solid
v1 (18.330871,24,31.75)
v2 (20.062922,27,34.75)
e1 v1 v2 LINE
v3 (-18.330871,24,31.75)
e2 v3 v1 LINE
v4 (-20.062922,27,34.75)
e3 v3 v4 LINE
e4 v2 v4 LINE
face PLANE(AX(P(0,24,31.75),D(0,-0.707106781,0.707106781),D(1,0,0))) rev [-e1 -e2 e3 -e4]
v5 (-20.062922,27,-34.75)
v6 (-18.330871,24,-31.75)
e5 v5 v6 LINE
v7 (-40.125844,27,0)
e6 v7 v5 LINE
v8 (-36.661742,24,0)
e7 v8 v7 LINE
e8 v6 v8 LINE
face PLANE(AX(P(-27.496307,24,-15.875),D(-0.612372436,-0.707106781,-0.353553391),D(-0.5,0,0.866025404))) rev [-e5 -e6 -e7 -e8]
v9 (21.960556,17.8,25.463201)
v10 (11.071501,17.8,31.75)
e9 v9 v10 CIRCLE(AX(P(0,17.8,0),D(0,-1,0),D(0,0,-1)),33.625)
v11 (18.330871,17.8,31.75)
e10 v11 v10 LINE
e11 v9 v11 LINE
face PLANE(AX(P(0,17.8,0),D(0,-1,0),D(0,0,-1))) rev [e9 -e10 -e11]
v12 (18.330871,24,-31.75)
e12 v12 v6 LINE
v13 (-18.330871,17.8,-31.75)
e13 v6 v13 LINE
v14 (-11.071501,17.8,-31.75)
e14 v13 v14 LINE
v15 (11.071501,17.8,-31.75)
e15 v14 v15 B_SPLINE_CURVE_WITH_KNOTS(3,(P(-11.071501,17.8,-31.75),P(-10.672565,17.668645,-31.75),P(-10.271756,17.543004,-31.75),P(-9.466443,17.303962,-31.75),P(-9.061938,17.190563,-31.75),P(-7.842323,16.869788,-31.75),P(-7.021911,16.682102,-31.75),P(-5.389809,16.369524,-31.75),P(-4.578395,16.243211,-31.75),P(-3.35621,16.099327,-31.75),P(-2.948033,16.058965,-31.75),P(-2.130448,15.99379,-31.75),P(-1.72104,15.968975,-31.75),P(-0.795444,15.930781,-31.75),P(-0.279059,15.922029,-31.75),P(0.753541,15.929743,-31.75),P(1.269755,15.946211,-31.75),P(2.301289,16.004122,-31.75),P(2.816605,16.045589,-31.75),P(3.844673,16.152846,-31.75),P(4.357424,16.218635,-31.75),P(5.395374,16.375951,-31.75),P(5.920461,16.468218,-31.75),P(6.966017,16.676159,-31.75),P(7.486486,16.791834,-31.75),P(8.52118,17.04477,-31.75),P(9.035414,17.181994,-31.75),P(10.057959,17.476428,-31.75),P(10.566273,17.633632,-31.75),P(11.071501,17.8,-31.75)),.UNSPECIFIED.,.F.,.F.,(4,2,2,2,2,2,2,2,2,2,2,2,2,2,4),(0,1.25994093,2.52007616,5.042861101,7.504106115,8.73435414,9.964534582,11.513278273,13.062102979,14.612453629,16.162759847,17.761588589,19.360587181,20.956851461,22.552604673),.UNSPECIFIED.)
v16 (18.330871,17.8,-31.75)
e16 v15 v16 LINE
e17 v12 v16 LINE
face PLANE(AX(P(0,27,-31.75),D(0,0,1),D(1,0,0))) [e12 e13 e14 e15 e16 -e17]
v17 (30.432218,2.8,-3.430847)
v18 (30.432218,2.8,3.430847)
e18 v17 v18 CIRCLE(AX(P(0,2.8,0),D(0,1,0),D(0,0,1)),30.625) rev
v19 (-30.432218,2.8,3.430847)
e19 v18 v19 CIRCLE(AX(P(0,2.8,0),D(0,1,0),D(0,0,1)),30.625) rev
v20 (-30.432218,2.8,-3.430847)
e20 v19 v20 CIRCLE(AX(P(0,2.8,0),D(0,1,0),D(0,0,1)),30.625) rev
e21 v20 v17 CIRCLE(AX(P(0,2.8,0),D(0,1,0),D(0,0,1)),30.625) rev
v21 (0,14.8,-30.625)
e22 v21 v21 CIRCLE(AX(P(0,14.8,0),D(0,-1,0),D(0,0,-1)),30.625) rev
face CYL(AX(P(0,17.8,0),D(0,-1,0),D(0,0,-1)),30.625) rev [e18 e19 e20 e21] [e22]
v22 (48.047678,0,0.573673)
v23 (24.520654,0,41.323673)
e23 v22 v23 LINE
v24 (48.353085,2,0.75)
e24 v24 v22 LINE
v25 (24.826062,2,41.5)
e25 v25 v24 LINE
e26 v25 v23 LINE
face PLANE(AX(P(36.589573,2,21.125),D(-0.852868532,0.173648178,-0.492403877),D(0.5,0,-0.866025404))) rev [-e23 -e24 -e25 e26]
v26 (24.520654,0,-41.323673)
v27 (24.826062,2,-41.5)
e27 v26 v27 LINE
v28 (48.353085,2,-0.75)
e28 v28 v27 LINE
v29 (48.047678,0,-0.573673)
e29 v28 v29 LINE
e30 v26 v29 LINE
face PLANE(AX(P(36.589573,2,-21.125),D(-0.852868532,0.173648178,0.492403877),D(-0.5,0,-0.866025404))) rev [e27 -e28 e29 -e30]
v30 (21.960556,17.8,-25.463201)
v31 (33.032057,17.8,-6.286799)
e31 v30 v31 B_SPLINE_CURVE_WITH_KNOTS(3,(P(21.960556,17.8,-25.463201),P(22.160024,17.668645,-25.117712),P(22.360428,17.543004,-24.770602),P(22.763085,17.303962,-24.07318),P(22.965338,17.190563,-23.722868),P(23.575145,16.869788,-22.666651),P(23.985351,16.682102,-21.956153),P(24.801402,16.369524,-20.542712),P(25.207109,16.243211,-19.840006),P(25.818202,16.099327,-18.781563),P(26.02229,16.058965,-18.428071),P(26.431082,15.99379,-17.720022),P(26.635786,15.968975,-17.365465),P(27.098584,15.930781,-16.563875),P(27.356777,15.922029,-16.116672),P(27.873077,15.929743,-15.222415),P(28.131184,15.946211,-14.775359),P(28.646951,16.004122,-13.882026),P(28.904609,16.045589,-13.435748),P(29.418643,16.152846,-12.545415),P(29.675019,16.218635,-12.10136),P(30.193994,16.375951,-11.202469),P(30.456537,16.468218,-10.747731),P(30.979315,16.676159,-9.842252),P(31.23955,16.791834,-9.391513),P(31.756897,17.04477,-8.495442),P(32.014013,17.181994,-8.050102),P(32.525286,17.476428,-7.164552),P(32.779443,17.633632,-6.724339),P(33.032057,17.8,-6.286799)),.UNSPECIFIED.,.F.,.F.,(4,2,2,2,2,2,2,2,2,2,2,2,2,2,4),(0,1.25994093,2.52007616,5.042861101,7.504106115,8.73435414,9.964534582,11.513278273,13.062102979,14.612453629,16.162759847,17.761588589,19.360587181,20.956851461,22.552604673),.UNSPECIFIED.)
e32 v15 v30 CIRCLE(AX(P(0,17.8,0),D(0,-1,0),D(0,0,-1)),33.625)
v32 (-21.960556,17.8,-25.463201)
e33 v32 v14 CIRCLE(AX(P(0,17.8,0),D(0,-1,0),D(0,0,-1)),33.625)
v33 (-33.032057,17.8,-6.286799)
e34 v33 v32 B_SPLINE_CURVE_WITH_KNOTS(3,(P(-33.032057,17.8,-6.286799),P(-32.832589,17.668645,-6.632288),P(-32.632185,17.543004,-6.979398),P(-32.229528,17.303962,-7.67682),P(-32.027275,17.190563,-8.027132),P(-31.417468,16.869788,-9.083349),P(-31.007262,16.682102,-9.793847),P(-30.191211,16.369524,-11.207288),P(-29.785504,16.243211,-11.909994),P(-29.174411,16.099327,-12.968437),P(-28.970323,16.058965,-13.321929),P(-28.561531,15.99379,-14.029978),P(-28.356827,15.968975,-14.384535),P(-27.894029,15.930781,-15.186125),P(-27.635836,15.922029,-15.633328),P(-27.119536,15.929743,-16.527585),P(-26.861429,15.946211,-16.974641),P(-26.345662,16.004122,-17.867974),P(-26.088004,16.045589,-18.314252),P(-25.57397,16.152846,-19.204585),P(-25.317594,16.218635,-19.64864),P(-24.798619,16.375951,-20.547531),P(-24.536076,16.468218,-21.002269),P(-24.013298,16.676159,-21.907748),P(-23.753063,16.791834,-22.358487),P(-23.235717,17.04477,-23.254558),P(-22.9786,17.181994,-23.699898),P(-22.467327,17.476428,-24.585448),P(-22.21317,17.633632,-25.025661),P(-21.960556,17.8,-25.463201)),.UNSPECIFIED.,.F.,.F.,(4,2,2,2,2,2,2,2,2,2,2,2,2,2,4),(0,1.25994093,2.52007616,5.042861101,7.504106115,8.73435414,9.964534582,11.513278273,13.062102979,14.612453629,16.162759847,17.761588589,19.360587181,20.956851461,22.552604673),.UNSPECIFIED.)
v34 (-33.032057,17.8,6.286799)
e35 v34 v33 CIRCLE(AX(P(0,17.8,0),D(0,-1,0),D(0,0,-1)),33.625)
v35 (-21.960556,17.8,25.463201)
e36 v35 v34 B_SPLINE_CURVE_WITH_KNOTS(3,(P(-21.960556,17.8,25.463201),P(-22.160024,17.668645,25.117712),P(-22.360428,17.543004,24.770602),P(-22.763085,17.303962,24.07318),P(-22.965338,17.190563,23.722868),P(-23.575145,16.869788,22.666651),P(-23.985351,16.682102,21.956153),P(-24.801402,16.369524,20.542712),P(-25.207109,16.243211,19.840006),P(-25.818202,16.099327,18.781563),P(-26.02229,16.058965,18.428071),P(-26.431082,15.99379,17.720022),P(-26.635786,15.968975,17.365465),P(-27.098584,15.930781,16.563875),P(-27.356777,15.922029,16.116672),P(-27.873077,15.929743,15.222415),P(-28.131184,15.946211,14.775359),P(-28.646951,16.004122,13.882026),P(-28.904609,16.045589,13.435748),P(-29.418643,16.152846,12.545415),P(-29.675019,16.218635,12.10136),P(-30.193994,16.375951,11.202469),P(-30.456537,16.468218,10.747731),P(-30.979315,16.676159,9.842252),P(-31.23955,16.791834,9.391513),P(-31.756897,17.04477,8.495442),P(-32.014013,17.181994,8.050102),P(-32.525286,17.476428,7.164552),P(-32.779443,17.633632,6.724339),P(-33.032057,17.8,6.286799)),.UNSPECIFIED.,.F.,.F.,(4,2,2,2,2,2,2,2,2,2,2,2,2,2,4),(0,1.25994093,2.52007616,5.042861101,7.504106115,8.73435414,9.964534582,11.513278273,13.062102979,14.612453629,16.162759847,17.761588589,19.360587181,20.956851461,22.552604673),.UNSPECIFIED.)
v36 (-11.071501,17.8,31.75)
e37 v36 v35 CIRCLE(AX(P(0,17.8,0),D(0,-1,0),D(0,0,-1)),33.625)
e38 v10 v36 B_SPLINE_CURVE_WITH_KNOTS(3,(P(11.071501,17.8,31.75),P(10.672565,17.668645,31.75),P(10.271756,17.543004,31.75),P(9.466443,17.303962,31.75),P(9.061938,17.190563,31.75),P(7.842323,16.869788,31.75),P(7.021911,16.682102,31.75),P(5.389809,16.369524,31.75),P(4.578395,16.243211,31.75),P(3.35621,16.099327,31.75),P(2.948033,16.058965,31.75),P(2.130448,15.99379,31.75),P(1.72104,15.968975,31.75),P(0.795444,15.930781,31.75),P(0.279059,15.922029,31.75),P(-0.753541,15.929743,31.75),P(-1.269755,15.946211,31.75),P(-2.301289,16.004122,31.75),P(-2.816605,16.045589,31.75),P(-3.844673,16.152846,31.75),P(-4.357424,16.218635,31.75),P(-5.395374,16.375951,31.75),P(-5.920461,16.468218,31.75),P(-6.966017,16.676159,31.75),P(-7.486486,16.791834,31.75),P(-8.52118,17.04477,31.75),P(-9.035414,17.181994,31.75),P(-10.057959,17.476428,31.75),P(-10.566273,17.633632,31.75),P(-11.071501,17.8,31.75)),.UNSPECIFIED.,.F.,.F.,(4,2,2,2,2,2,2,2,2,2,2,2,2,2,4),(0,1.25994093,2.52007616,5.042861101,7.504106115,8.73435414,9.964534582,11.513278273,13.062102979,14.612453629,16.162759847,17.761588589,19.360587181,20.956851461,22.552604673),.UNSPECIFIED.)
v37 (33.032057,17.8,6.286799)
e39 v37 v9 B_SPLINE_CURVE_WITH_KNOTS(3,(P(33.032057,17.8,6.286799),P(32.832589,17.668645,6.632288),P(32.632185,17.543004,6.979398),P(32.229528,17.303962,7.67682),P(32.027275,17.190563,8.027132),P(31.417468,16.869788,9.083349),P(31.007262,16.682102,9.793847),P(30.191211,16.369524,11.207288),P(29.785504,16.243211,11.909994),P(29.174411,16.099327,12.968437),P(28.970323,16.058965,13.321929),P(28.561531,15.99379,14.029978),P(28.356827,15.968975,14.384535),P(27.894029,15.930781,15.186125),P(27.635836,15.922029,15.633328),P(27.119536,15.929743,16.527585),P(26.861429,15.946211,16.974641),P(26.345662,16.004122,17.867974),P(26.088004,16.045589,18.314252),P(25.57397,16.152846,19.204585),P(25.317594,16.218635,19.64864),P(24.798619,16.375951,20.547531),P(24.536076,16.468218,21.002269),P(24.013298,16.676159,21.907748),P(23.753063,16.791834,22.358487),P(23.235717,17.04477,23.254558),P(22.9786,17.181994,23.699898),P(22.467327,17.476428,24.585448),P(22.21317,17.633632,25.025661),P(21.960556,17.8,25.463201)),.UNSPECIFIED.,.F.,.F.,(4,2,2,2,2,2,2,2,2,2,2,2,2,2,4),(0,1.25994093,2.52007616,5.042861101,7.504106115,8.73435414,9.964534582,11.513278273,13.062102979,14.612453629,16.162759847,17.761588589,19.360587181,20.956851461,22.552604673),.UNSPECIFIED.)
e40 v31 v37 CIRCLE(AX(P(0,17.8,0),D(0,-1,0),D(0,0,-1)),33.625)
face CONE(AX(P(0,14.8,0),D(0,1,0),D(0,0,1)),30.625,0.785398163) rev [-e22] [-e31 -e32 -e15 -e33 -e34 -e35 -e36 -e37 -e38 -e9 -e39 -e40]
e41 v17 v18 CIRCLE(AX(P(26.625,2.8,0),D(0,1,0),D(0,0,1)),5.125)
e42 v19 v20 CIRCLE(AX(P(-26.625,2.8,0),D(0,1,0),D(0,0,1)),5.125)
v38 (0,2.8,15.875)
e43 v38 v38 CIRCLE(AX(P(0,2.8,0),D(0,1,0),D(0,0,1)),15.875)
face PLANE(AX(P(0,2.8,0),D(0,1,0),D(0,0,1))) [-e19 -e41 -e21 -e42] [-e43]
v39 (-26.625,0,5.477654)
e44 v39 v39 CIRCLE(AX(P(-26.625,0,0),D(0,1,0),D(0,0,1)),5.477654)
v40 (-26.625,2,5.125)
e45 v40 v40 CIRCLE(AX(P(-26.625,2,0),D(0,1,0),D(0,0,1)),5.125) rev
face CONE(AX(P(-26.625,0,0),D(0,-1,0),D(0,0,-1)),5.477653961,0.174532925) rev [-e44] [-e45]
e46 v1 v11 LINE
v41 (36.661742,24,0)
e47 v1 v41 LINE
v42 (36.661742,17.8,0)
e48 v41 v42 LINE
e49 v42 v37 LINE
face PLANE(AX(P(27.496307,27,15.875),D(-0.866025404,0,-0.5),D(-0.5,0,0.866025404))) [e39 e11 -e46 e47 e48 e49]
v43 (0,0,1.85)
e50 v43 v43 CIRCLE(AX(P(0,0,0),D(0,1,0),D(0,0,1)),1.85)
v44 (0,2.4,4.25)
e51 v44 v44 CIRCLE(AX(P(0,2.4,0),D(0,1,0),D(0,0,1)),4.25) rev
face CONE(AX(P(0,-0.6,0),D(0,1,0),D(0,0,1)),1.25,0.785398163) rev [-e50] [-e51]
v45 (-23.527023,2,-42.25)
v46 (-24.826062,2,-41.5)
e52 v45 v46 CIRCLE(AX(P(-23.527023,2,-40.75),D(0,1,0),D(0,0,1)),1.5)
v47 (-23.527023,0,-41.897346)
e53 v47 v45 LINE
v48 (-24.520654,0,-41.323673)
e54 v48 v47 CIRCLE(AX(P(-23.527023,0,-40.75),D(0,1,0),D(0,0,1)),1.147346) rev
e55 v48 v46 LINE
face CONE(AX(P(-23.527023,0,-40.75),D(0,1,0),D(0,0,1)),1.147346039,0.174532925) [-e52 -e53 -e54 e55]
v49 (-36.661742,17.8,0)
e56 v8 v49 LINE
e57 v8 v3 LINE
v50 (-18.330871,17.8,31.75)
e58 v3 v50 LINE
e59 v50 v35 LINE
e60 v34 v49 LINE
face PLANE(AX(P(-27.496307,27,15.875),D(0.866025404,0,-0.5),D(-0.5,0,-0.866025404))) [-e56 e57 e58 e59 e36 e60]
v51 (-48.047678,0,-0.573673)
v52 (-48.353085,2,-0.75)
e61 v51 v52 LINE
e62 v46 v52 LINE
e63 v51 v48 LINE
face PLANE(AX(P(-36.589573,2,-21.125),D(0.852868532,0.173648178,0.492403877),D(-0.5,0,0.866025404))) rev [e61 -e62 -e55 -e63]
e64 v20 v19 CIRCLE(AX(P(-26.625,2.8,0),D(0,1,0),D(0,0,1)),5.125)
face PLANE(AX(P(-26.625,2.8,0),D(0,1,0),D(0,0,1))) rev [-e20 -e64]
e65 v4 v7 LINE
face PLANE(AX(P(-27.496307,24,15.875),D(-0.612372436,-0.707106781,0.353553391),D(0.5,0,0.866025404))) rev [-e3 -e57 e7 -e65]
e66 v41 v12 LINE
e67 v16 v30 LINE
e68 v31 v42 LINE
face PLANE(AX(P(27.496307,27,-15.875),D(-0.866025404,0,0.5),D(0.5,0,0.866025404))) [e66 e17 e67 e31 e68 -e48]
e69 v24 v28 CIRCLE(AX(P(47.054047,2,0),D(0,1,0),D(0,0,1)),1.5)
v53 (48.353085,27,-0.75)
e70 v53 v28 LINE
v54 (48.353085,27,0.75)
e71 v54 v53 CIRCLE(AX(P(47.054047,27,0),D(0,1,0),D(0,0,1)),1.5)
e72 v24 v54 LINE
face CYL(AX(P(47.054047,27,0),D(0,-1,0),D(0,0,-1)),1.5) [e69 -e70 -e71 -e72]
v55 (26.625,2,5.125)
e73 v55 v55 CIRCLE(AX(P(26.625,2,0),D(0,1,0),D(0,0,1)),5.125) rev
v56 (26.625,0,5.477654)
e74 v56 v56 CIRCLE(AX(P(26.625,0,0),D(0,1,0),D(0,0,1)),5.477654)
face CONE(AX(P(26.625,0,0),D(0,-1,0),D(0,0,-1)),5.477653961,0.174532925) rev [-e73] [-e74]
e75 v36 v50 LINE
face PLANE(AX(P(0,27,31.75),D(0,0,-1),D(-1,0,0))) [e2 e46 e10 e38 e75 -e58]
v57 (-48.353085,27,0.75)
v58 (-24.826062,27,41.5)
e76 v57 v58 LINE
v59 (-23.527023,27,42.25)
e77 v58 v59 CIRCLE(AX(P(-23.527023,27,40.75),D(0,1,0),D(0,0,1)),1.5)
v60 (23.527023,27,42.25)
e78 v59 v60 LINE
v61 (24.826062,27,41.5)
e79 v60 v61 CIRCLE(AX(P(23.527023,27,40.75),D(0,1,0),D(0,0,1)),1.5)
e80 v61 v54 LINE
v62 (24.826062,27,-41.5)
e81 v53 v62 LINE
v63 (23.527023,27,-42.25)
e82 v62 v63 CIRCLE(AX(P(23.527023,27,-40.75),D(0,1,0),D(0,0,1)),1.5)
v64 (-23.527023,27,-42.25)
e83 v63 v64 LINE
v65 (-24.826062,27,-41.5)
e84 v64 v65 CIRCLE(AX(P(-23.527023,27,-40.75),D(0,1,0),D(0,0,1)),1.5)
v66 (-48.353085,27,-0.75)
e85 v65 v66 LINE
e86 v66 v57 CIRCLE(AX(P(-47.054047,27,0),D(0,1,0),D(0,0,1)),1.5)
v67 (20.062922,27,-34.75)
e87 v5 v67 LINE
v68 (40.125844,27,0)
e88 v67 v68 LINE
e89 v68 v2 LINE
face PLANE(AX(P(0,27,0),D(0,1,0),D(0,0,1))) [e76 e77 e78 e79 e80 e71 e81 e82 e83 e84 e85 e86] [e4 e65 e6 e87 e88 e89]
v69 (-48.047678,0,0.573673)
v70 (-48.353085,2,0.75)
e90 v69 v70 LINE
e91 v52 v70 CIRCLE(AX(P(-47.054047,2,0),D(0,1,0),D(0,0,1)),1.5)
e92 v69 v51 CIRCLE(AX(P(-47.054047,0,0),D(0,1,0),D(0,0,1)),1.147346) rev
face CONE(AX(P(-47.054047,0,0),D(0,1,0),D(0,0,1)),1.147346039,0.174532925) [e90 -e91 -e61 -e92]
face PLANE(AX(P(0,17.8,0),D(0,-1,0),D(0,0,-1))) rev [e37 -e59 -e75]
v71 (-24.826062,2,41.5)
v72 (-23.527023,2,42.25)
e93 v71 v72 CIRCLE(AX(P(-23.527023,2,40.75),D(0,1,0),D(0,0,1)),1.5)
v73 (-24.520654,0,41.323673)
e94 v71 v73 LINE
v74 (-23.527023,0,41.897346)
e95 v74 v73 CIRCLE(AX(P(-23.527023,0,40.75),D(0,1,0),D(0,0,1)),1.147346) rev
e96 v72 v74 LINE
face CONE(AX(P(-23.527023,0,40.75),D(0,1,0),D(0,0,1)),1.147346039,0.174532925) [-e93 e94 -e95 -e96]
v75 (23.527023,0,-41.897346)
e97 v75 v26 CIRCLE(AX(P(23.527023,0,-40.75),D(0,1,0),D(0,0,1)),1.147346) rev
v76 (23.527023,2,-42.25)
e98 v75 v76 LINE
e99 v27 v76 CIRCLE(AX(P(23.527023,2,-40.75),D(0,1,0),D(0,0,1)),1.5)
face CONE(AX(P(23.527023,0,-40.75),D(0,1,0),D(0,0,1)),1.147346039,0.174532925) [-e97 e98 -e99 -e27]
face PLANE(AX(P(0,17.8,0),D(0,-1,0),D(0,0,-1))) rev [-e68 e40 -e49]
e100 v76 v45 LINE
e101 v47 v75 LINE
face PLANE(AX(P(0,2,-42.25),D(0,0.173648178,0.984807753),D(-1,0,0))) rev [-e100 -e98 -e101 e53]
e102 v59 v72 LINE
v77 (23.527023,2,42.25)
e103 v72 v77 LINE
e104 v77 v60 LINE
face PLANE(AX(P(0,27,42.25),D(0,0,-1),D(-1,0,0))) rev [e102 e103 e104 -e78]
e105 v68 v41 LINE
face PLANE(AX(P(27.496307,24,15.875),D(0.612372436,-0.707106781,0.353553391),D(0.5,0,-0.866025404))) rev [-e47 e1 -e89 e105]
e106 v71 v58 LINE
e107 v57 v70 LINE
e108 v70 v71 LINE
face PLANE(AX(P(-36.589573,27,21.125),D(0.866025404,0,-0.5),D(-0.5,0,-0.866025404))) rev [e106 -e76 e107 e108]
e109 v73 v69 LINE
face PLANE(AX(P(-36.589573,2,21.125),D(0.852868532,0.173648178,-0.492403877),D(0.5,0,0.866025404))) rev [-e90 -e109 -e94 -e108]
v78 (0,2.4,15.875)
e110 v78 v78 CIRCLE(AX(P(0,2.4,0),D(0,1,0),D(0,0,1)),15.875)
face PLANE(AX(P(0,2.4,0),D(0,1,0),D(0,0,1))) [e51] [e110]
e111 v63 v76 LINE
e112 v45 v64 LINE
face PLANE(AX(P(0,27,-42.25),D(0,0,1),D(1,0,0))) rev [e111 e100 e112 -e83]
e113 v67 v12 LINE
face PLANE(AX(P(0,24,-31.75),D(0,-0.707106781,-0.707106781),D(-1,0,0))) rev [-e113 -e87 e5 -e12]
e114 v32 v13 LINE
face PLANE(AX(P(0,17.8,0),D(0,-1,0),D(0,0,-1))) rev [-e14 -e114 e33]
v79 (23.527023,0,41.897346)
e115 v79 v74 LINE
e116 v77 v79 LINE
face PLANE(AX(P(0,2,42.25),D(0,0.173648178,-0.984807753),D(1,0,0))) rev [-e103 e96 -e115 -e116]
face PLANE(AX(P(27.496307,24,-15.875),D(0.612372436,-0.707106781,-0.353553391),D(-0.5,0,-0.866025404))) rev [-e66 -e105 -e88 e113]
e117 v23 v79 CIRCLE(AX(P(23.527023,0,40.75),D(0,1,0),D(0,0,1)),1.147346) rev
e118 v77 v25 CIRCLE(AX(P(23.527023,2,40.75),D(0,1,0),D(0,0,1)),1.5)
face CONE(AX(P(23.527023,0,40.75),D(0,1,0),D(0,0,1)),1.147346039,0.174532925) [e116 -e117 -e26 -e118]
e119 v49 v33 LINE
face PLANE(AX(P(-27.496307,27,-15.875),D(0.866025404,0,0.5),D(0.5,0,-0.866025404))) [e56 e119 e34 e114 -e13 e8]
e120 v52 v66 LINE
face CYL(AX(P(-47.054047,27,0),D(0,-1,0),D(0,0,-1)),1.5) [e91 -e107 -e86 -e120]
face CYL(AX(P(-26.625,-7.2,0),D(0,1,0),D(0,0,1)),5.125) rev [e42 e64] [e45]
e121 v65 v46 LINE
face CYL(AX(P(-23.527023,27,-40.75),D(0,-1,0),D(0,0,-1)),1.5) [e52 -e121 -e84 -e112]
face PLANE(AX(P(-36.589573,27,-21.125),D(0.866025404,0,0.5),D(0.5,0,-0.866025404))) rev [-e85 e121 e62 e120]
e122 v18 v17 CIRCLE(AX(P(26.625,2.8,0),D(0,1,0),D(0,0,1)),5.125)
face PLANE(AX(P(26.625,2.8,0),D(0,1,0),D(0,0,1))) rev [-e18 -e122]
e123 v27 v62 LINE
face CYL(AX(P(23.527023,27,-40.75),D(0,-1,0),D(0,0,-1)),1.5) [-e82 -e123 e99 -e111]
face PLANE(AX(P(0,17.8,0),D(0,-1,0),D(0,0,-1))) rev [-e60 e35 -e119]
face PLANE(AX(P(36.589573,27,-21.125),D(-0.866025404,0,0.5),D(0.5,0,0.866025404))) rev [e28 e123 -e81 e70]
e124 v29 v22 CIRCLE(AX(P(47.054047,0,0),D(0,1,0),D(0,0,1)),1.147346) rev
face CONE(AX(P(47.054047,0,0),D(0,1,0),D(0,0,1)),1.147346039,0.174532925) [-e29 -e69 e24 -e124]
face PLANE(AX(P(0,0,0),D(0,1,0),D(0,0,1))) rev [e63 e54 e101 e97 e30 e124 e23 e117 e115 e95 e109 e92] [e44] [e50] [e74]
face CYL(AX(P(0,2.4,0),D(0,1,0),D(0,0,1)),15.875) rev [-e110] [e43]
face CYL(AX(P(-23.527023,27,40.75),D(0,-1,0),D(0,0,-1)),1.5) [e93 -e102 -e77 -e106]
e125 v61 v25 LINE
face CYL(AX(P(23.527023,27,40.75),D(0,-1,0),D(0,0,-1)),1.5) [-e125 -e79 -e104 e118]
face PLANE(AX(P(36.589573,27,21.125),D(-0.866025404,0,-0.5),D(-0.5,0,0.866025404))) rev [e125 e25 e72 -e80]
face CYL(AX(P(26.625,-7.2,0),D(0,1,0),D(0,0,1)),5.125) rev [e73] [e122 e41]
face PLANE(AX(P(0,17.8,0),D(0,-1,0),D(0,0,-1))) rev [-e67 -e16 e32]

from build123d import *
from OCP.BRepFilletAPI import BRepFilletAPI_MakeChamfer

# Parameters (mm, degrees)
BOSS_EXTRUDE1_DEPTH = 27
SKETCH1_5_R         = 1.25
BOSS_EXTRUDE2_DEPTH = 2.8
BOSS_EXTRUDE3_START = 2.8
SKETCH1_6_R         = 30.625
BOSS_EXTRUDE3_DEPTH = 15
CUT_EXTRUDE2_START  = 2.8
SKETCH1_8_R         = 5.125
CUT_EXTRUDE2_DEPTH  = 10
CUT_EXTRUDE1_START  = 2.8
SKETCH1_7_R         = 15.875
CUT_EXTRUDE1_DEPTH  = 0.4
CHAMFER1_SIZE       = 3
FILLET1_R           = 1.5
CHAMFER2_SIZE       = 3
CHAMFER3_SIZE       = 2
CHAMFER3_SIZE2      = 0.352653961
CHAMFER4_SIZE       = 2
CHAMFER4_SIZE2      = 0.352653961


with BuildPart() as part:
    # Sketch1 → Boss-Extrude1 (new body)
    with BuildSketch(Plane(origin=(0, 0, 0), x_dir=(1, 0, 0), z_dir=(0, 1, 0))):
        Polygon((-36.661742094, 0), (-18.330871047, 31.75), (-24.393048873, 42.25), (-48.786097747, 0), (-24.393048873, -42.25), (24.393048873, -42.25), (48.786097747, 0), (36.661742094, 0), (18.330871047, -31.75), (-18.330871047, -31.75), align=None)
        Polygon((-24.393048873, 42.25), (-18.330871047, 31.75), (18.330871047, 31.75), (24.393048873, 42.25), align=None)
        Polygon((24.393048873, 42.25), (18.330871047, 31.75), (36.661742094, 0), (48.786097747, 0), align=None)
    extrude(amount=BOSS_EXTRUDE1_DEPTH)

    # Sketch1<5> → Boss-Extrude2 (add)
    with BuildSketch(Plane(origin=(0, 0, 0), x_dir=(1, 0, 0), z_dir=(0, 1, 0))):
        Polygon((18.330871047, 31.75), (-18.330871047, 31.75), (-36.661742094, 0), (-18.330871047, -31.75), (18.330871047, -31.75), (36.661742094, 0), align=None)
        with Locations(Location((0, 0, 0), (0, 0, 270))):
            Circle(SKETCH1_5_R, mode=Mode.SUBTRACT)
    extrude(amount=BOSS_EXTRUDE2_DEPTH)

    # Sketch1<6> → Boss-Extrude3 (add)
    with BuildSketch(Plane(origin=(0, 0, 0), x_dir=(1, 0, 0), z_dir=(0, 1, 0)).offset(BOSS_EXTRUDE3_START)):
        Polygon((18.330871047, 31.75), (-18.330871047, 31.75), (-36.661742094, 0), (-18.330871047, -31.75), (18.330871047, -31.75), (36.661742094, 0), align=None)
        with Locations(Location((0, 0, 0), (0, 0, 270))):
            Circle(SKETCH1_6_R, mode=Mode.SUBTRACT)
    extrude(amount=BOSS_EXTRUDE3_DEPTH)

    # Sketch1<8> → Cut-Extrude2 (cut)
    with BuildSketch(Plane(origin=(0, 0, 0), x_dir=(1, 0, 0), z_dir=(0, 1, 0)).offset(CUT_EXTRUDE2_START)):
        with Locations(Location((26.625, 0, 0), (0, 0, 270))):
            Circle(SKETCH1_8_R)
        with Locations(Location((-26.625, 0, 0), (0, 0, 270))):
            Circle(SKETCH1_8_R)
    extrude(amount=-CUT_EXTRUDE2_DEPTH, mode=Mode.SUBTRACT)

    # Sketch1<7> → Cut-Extrude1 (cut)
    with BuildSketch(Plane(origin=(0, 0, 0), x_dir=(1, 0, 0), z_dir=(0, 1, 0)).offset(CUT_EXTRUDE1_START)):
        with Locations(Location((0, 0, 0), (0, 0, 270))):
            Circle(SKETCH1_7_R)
    extrude(amount=-CUT_EXTRUDE1_DEPTH, mode=Mode.SUBTRACT)

    # Chamfer1
    # the kernel refuses this chamfer: 3 mm, written as the material it takes off along each edge
    with BuildSketch(Plane(origin=(26.045920011, 27, 31.75), x_dir=(0, 0.027495876610586768, 0.9996219169112968), z_dir=(-1, 0, 0))) as chamfer1_piece_1_section:
        Polygon((CHAMFER1_SIZE * 0.999621916911, -CHAMFER1_SIZE * 0.0274958766106), (-CHAMFER1_SIZE * 0.0274958766106, -CHAMFER1_SIZE * 0.999621916911), (0, 0), align=None)
    chamfer1_piece_1 = extrude(amount=52.091840021, mode=Mode.PRIVATE)
    chamfer1_piece_1 = split(chamfer1_piece_1, bisect_by=Plane(origin=(13.32778404, 26.000686335, 40.41560089), z_dir=(-0.8660254037844387, 0, -0.5000000000000001)), keep=Keep.TOP, mode=Mode.PRIVATE)
    chamfer1_piece_1 = split(chamfer1_piece_1, bisect_by=Plane(origin=(-13.32778404, 26.000686335, 40.41560089), z_dir=(0.8660254037844386, 0, -0.5000000000000002)), keep=Keep.TOP, mode=Mode.PRIVATE)
    add(chamfer1_piece_1, mode=Mode.SUBTRACT)
    with BuildSketch(Plane(origin=(-14.473346565, 27, 38.431428394), x_dir=(-0.8656979742248803, 0.02749587661058676, 0.4998109584556486), z_dir=(-0.5000000000000002, 0, -0.8660254037844386))) as chamfer1_piece_2_section:
        Polygon((CHAMFER1_SIZE * 0.999621916911, -CHAMFER1_SIZE * 0.0274958766106), (-CHAMFER1_SIZE * 0.0274958766106, -CHAMFER1_SIZE * 0.999621916911), (0, 0), align=None)
    chamfer1_piece_2 = extrude(amount=52.091840021, mode=Mode.PRIVATE)
    chamfer1_piece_2 = split(chamfer1_piece_2, bisect_by=Plane(origin=(-28.33704506, 26.000686335, 31.75), z_dir=(0, 0, -1)), keep=Keep.TOP, mode=Mode.PRIVATE)
    chamfer1_piece_2 = split(chamfer1_piece_2, bisect_by=Plane(origin=(-41.6648291, 26.000686335, 8.66560089), z_dir=(0.8660254037844387, 0, 0.5000000000000001)), keep=Keep.TOP, mode=Mode.PRIVATE)
    add(chamfer1_piece_2, mode=Mode.SUBTRACT)
    with BuildSketch(Plane(origin=(-40.519266575, 27, 6.681428394), x_dir=(-0.8656979742248804, 0.02749587661058679, -0.49981095845564844), z_dir=(0.5000000000000001, 0, -0.8660254037844387))) as chamfer1_piece_3_section:
        Polygon((CHAMFER1_SIZE * 0.999621916911, -CHAMFER1_SIZE * 0.0274958766106), (-CHAMFER1_SIZE * 0.0274958766106, -CHAMFER1_SIZE * 0.999621916911), (0, 0), align=None)
    chamfer1_piece_3 = extrude(amount=52.091840021, mode=Mode.PRIVATE)
    chamfer1_piece_3 = split(chamfer1_piece_3, bisect_by=Plane(origin=(-41.6648291, 26.000686335, -8.66560089), z_dir=(0.8660254037844386, 0, -0.5000000000000002)), keep=Keep.TOP, mode=Mode.PRIVATE)
    chamfer1_piece_3 = split(chamfer1_piece_3, bisect_by=Plane(origin=(-28.33704506, 26.000686335, -31.75), z_dir=(0, 0, 1)), keep=Keep.TOP, mode=Mode.PRIVATE)
    add(chamfer1_piece_3, mode=Mode.SUBTRACT)
    with BuildSketch(Plane(origin=(-26.045920011, 27, -31.75), x_dir=(0, 0.027495876610586733, -0.9996219169112968), z_dir=(1, 0, 0))) as chamfer1_piece_4_section:
        Polygon((CHAMFER1_SIZE * 0.999621916911, -CHAMFER1_SIZE * 0.0274958766106), (-CHAMFER1_SIZE * 0.0274958766106, -CHAMFER1_SIZE * 0.999621916911), (0, 0), align=None)
    chamfer1_piece_4 = extrude(amount=52.091840021, mode=Mode.PRIVATE)
    chamfer1_piece_4 = split(chamfer1_piece_4, bisect_by=Plane(origin=(-13.32778404, 26.000686335, -40.41560089), z_dir=(0.8660254037844387, 0, 0.5000000000000001)), keep=Keep.TOP, mode=Mode.PRIVATE)
    chamfer1_piece_4 = split(chamfer1_piece_4, bisect_by=Plane(origin=(13.32778404, 26.000686335, -40.41560089), z_dir=(-0.8660254037844385, 0, 0.5000000000000004)), keep=Keep.TOP, mode=Mode.PRIVATE)
    add(chamfer1_piece_4, mode=Mode.SUBTRACT)
    with BuildSketch(Plane(origin=(14.473346565, 27, -38.431428394), x_dir=(0.86569797422488, 0.02749587661058676, -0.4998109584556487), z_dir=(0.5000000000000004, 0, 0.8660254037844385))) as chamfer1_piece_5_section:
        Polygon((CHAMFER1_SIZE * 0.999621916911, -CHAMFER1_SIZE * 0.0274958766106), (-CHAMFER1_SIZE * 0.0274958766106, -CHAMFER1_SIZE * 0.999621916911), (0, 0), align=None)
    chamfer1_piece_5 = extrude(amount=52.091840021, mode=Mode.PRIVATE)
    chamfer1_piece_5 = split(chamfer1_piece_5, bisect_by=Plane(origin=(41.6648291, 26.000686335, -8.66560089), z_dir=(-0.8660254037844387, 0, -0.5000000000000001)), keep=Keep.TOP, mode=Mode.PRIVATE)
    chamfer1_piece_5 = split(chamfer1_piece_5, bisect_by=Plane(origin=(28.33704506, 26.000686335, -31.75), z_dir=(0, 0, 1)), keep=Keep.TOP, mode=Mode.PRIVATE)
    add(chamfer1_piece_5, mode=Mode.SUBTRACT)
    with BuildSketch(Plane(origin=(40.519266575, 27, -6.681428394), x_dir=(0.8656979742248803, 0.02749587661058679, 0.4998109584556484), z_dir=(-0.5000000000000001, 0, 0.8660254037844387))) as chamfer1_piece_6_section:
        Polygon((CHAMFER1_SIZE * 0.999621916911, -CHAMFER1_SIZE * 0.0274958766106), (-CHAMFER1_SIZE * 0.0274958766106, -CHAMFER1_SIZE * 0.999621916911), (0, 0), align=None)
    chamfer1_piece_6 = extrude(amount=52.091840021, mode=Mode.PRIVATE)
    chamfer1_piece_6 = split(chamfer1_piece_6, bisect_by=Plane(origin=(28.33704506, 26.000686335, 31.75), z_dir=(0, 0, -1)), keep=Keep.TOP, mode=Mode.PRIVATE)
    chamfer1_piece_6 = split(chamfer1_piece_6, bisect_by=Plane(origin=(41.6648291, 26.000686335, 8.66560089), z_dir=(-0.8660254037844385, 0, 0.5000000000000004)), keep=Keep.TOP, mode=Mode.PRIVATE)
    add(chamfer1_piece_6, mode=Mode.SUBTRACT)
    with BuildSketch(Plane(origin=(0, 17.8, 0), x_dir=(0, 0, 1), z_dir=(-1, 0, 0))) as chamfer1_piece_7_section:
        Polygon((30.625 + CHAMFER1_SIZE, 0), (30.625, -CHAMFER1_SIZE), (30.625, 0), align=None)
    chamfer1_piece_7 = revolve(axis=Axis((0, 17.8, 0), (0, 1, 0)), mode=Mode.PRIVATE)
    chamfer1_piece_7 = split(chamfer1_piece_7, bisect_by=Plane(origin=(27.49630657, 15.310214491, 15.875), z_dir=(-0.8660254037844387, 0, -0.5000000000000001)), keep=Keep.TOP, mode=Mode.PRIVATE)
    chamfer1_piece_7 = split(chamfer1_piece_7, bisect_by=Plane(origin=(26.848215095, 15.310214491, 31.75), z_dir=(0, 0, -1)), keep=Keep.TOP, mode=Mode.PRIVATE)
    chamfer1_piece_7 = split(chamfer1_piece_7, bisect_by=Plane(origin=(-14.072199023, 15.310214491, 39.126236318), z_dir=(0.8660254037844386, 0, -0.5000000000000002)), keep=Keep.TOP, mode=Mode.PRIVATE)
    chamfer1_piece_7 = split(chamfer1_piece_7, bisect_by=Plane(origin=(-27.49630657, 15.310214491, -15.875), z_dir=(0.8660254037844387, 0, 0.5000000000000001)), keep=Keep.TOP, mode=Mode.PRIVATE)
    chamfer1_piece_7 = split(chamfer1_piece_7, bisect_by=Plane(origin=(26.848215095, 15.310214491, -31.75), z_dir=(0, 0, 1)), keep=Keep.TOP, mode=Mode.PRIVATE)
    chamfer1_piece_7 = split(chamfer1_piece_7, bisect_by=Plane(origin=(40.920414118, 15.310214491, 7.376236318), z_dir=(-0.8660254037844385, 0, 0.5000000000000004)), keep=Keep.TOP, mode=Mode.PRIVATE)
    add(chamfer1_piece_7, mode=Mode.SUBTRACT)
    with BuildSketch(Plane(origin=(40.519266575, 27, -6.681428394), x_dir=(0.8656979742248803, 0.02749587661058679, 0.4998109584556484), z_dir=(-0.5000000000000001, 0, 0.8660254037844387))) as chamfer1_piece_8a_section:
        Polygon((CHAMFER1_SIZE * 0.999621916911, -CHAMFER1_SIZE * 0.0274958766106), (-CHAMFER1_SIZE * 0.0274958766106, -CHAMFER1_SIZE * 0.999621916911), (0, 0), align=None)
    chamfer1_piece_8a = extrude(amount=52.091840021, mode=Mode.PRIVATE)
    chamfer1_piece_8a = split(chamfer1_piece_8a, bisect_by=Plane(origin=(17.441976447, 26.031907688, 31.75), z_dir=(0, 0, 1)), keep=Keep.TOP, mode=Mode.PRIVATE)
    with BuildSketch(Plane(origin=(26.045920011, 27, 31.75), x_dir=(0, 0.027495876610586768, 0.9996219169112968), z_dir=(-1, 0, 0))) as chamfer1_piece_8b_section:
        Polygon((CHAMFER1_SIZE * 0.999621916911, -CHAMFER1_SIZE * 0.0274958766106), (-CHAMFER1_SIZE * 0.0274958766106, -CHAMFER1_SIZE * 0.999621916911), (0, 0), align=None)
    chamfer1_piece_8b = extrude(amount=52.091840021, mode=Mode.PRIVATE)
    chamfer1_piece_8b = split(chamfer1_piece_8b, bisect_by=Plane(origin=(18.775318347, 26.031907688, 30.980194695), z_dir=(0.8660254037844387, 0, 0.5000000000000001)), keep=Keep.TOP, mode=Mode.PRIVATE)
    chamfer1_piece_8 = chamfer1_piece_8a & chamfer1_piece_8b
    add(chamfer1_piece_8, mode=Mode.SUBTRACT)
    with BuildSketch(Plane(origin=(26.045920011, 27, 31.75), x_dir=(0, 0.027495876610586768, 0.9996219169112968), z_dir=(-1, 0, 0))) as chamfer1_piece_9a_section:
        Polygon((CHAMFER1_SIZE * 0.999621916911, -CHAMFER1_SIZE * 0.0274958766106), (-CHAMFER1_SIZE * 0.0274958766106, -CHAMFER1_SIZE * 0.999621916911), (0, 0), align=None)
    chamfer1_piece_9a = extrude(amount=52.091840021, mode=Mode.PRIVATE)
    chamfer1_piece_9a = split(chamfer1_piece_9a, bisect_by=Plane(origin=(-18.775318347, 26.031907688, 30.980194695), z_dir=(-0.8660254037844386, 0, 0.5000000000000002)), keep=Keep.TOP, mode=Mode.PRIVATE)
    with BuildSketch(Plane(origin=(-14.473346565, 27, 38.431428394), x_dir=(-0.8656979742248803, 0.02749587661058676, 0.4998109584556486), z_dir=(-0.5000000000000002, 0, -0.8660254037844386))) as chamfer1_piece_9b_section:
        Polygon((CHAMFER1_SIZE * 0.999621916911, -CHAMFER1_SIZE * 0.0274958766106), (-CHAMFER1_SIZE * 0.0274958766106, -CHAMFER1_SIZE * 0.999621916911), (0, 0), align=None)
    chamfer1_piece_9b = extrude(amount=52.091840021, mode=Mode.PRIVATE)
    chamfer1_piece_9b = split(chamfer1_piece_9b, bisect_by=Plane(origin=(-17.441976447, 26.031907688, 31.75), z_dir=(0, 0, 1)), keep=Keep.TOP, mode=Mode.PRIVATE)
    chamfer1_piece_9 = chamfer1_piece_9a & chamfer1_piece_9b
    add(chamfer1_piece_9, mode=Mode.SUBTRACT)
    with BuildSketch(Plane(origin=(-14.473346565, 27, 38.431428394), x_dir=(-0.8656979742248803, 0.02749587661058676, 0.4998109584556486), z_dir=(-0.5000000000000002, 0, -0.8660254037844386))) as chamfer1_piece_10a_section:
        Polygon((CHAMFER1_SIZE * 0.999621916911, -CHAMFER1_SIZE * 0.0274958766106), (-CHAMFER1_SIZE * 0.0274958766106, -CHAMFER1_SIZE * 0.999621916911), (0, 0), align=None)
    chamfer1_piece_10a = extrude(amount=52.091840021, mode=Mode.PRIVATE)
    chamfer1_piece_10a = split(chamfer1_piece_10a, bisect_by=Plane(origin=(-36.217294794, 26.031907688, -0.769805305), z_dir=(-0.8660254037844387, 0, -0.5000000000000001)), keep=Keep.TOP, mode=Mode.PRIVATE)
    with BuildSketch(Plane(origin=(-40.519266575, 27, 6.681428394), x_dir=(-0.8656979742248804, 0.02749587661058679, -0.49981095845564844), z_dir=(0.5000000000000001, 0, -0.8660254037844387))) as chamfer1_piece_10b_section:
        Polygon((CHAMFER1_SIZE * 0.999621916911, -CHAMFER1_SIZE * 0.0274958766106), (-CHAMFER1_SIZE * 0.0274958766106, -CHAMFER1_SIZE * 0.999621916911), (0, 0), align=None)
    chamfer1_piece_10b = extrude(amount=52.091840021, mode=Mode.PRIVATE)
    chamfer1_piece_10b = split(chamfer1_piece_10b, bisect_by=Plane(origin=(-36.217294794, 26.031907688, 0.769805305), z_dir=(-0.8660254037844386, 0, 0.5000000000000002)), keep=Keep.TOP, mode=Mode.PRIVATE)
    chamfer1_piece_10 = chamfer1_piece_10a & chamfer1_piece_10b
    add(chamfer1_piece_10, mode=Mode.SUBTRACT)
    with BuildSketch(Plane(origin=(-40.519266575, 27, 6.681428394), x_dir=(-0.8656979742248804, 0.02749587661058679, -0.49981095845564844), z_dir=(0.5000000000000001, 0, -0.8660254037844387))) as chamfer1_piece_11a_section:
        Polygon((CHAMFER1_SIZE * 0.999621916911, -CHAMFER1_SIZE * 0.0274958766106), (-CHAMFER1_SIZE * 0.0274958766106, -CHAMFER1_SIZE * 0.999621916911), (0, 0), align=None)
    chamfer1_piece_11a = extrude(amount=52.091840021, mode=Mode.PRIVATE)
    chamfer1_piece_11a = split(chamfer1_piece_11a, bisect_by=Plane(origin=(-17.441976447, 26.031907688, -31.75), z_dir=(0, 0, -1)), keep=Keep.TOP, mode=Mode.PRIVATE)
    with BuildSketch(Plane(origin=(-26.045920011, 27, -31.75), x_dir=(0, 0.027495876610586733, -0.9996219169112968), z_dir=(1, 0, 0))) as chamfer1_piece_11b_section:
        Polygon((CHAMFER1_SIZE * 0.999621916911, -CHAMFER1_SIZE * 0.0274958766106), (-CHAMFER1_SIZE * 0.0274958766106, -CHAMFER1_SIZE * 0.999621916911), (0, 0), align=None)
    chamfer1_piece_11b = extrude(amount=52.091840021, mode=Mode.PRIVATE)
    chamfer1_piece_11b = split(chamfer1_piece_11b, bisect_by=Plane(origin=(-18.775318347, 26.031907688, -30.980194695), z_dir=(-0.8660254037844387, 0, -0.5000000000000001)), keep=Keep.TOP, mode=Mode.PRIVATE)
    chamfer1_piece_11 = chamfer1_piece_11a & chamfer1_piece_11b
    add(chamfer1_piece_11, mode=Mode.SUBTRACT)
    with BuildSketch(Plane(origin=(-26.045920011, 27, -31.75), x_dir=(0, 0.027495876610586733, -0.9996219169112968), z_dir=(1, 0, 0))) as chamfer1_piece_12a_section:
        Polygon((CHAMFER1_SIZE * 0.999621916911, -CHAMFER1_SIZE * 0.0274958766106), (-CHAMFER1_SIZE * 0.0274958766106, -CHAMFER1_SIZE * 0.999621916911), (0, 0), align=None)
    chamfer1_piece_12a = extrude(amount=52.091840021, mode=Mode.PRIVATE)
    chamfer1_piece_12a = split(chamfer1_piece_12a, bisect_by=Plane(origin=(18.775318347, 26.031907688, -30.980194695), z_dir=(0.8660254037844385, 0, -0.5000000000000004)), keep=Keep.TOP, mode=Mode.PRIVATE)
    with BuildSketch(Plane(origin=(14.473346565, 27, -38.431428394), x_dir=(0.86569797422488, 0.02749587661058676, -0.4998109584556487), z_dir=(0.5000000000000004, 0, 0.8660254037844385))) as chamfer1_piece_12b_section:
        Polygon((CHAMFER1_SIZE * 0.999621916911, -CHAMFER1_SIZE * 0.0274958766106), (-CHAMFER1_SIZE * 0.0274958766106, -CHAMFER1_SIZE * 0.999621916911), (0, 0), align=None)
    chamfer1_piece_12b = extrude(amount=52.091840021, mode=Mode.PRIVATE)
    chamfer1_piece_12b = split(chamfer1_piece_12b, bisect_by=Plane(origin=(17.441976447, 26.031907688, -31.75), z_dir=(0, 0, -1)), keep=Keep.TOP, mode=Mode.PRIVATE)
    chamfer1_piece_12 = chamfer1_piece_12a & chamfer1_piece_12b
    add(chamfer1_piece_12, mode=Mode.SUBTRACT)
    with BuildSketch(Plane(origin=(40.519266575, 27, -6.681428394), x_dir=(0.8656979742248803, 0.02749587661058679, 0.4998109584556484), z_dir=(-0.5000000000000001, 0, 0.8660254037844387))) as chamfer1_piece_13a_section:
        Polygon((CHAMFER1_SIZE * 0.999621916911, -CHAMFER1_SIZE * 0.0274958766106), (-CHAMFER1_SIZE * 0.0274958766106, -CHAMFER1_SIZE * 0.999621916911), (0, 0), align=None)
    chamfer1_piece_13a = extrude(amount=52.091840021, mode=Mode.PRIVATE)
    chamfer1_piece_13a = split(chamfer1_piece_13a, bisect_by=Plane(origin=(36.217294794, 26.031907688, -0.769805305), z_dir=(0.8660254037844385, 0, -0.5000000000000004)), keep=Keep.TOP, mode=Mode.PRIVATE)
    with BuildSketch(Plane(origin=(14.473346565, 27, -38.431428394), x_dir=(0.86569797422488, 0.02749587661058676, -0.4998109584556487), z_dir=(0.5000000000000004, 0, 0.8660254037844385))) as chamfer1_piece_13b_section:
        Polygon((CHAMFER1_SIZE * 0.999621916911, -CHAMFER1_SIZE * 0.0274958766106), (-CHAMFER1_SIZE * 0.0274958766106, -CHAMFER1_SIZE * 0.999621916911), (0, 0), align=None)
    chamfer1_piece_13b = extrude(amount=52.091840021, mode=Mode.PRIVATE)
    chamfer1_piece_13b = split(chamfer1_piece_13b, bisect_by=Plane(origin=(36.217294794, 26.031907688, 0.769805305), z_dir=(0.8660254037844387, 0, 0.5000000000000001)), keep=Keep.TOP, mode=Mode.PRIVATE)
    chamfer1_piece_13 = chamfer1_piece_13a & chamfer1_piece_13b
    add(chamfer1_piece_13, mode=Mode.SUBTRACT)

    # Fillet1
    fillet1_edges = [part.edges().sort_by_distance(p)[0] for p in [
        (-24.393048873, 13.5, 42.25),
        (-48.786097747, 13.5, 0),
        (-24.393048873, 13.5, -42.25),
        (24.393048873, 13.5, -42.25),
        (48.786097747, 13.5, 0),
        (24.393048873, 13.5, 42.25),
    ]]
    fillet(fillet1_edges, radius=FILLET1_R)

    # Chamfer2
    # the kernel refuses this chamfer: 3 mm, written as the material it takes off along each edge
    with BuildSketch(Plane(origin=(0, 2.4, 0), x_dir=(0, 0, 1), z_dir=(1, 0, 0))) as chamfer2_piece_1:
        Polygon((1.25, CHAMFER2_SIZE), (1.25 + CHAMFER2_SIZE, 0), (1.25, 0), align=None)
    revolve(axis=Axis((0, 2.4, 0), (0, -1, 0)), mode=Mode.SUBTRACT)

    # Chamfer3: one chamfer whose edges measure the first distance from different faces: ONE call of the kernel's chamfer builder (chamfer() names one face for all edges)
    chamfer3_edges_1 = [part.edges().sort_by_distance(p)[0] for p in [
        (-26.625, 0, -5.125),
    ]]
    chamfer3_side_1 = [part.faces().sort_by_distance(p)[0] for p in [
        (-26.625, 1.4, -5.125),
    ]]
    chamfer3_edges_2 = [part.edges().sort_by_distance(p)[0] for p in [
        (26.625, 0, -5.125),
    ]]
    chamfer3_side_2 = [part.faces().sort_by_distance(p)[0] for p in [
        (26.625, 1.4, -5.125),
    ]]
    chamfer3 = BRepFilletAPI_MakeChamfer(part.part.solid().wrapped)
    for e in chamfer3_edges_1:
        chamfer3.Add(CHAMFER3_SIZE, CHAMFER3_SIZE2, e.wrapped, chamfer3_side_1[0].wrapped)  # the first distance lies on this face
    for e in chamfer3_edges_2:
        chamfer3.Add(CHAMFER3_SIZE, CHAMFER3_SIZE2, e.wrapped, chamfer3_side_2[0].wrapped)  # the first distance lies on this face
    add(Compound.cast(chamfer3.Shape()), mode=Mode.REPLACE)

    # Chamfer4: one chamfer whose edges measure the first distance from different faces: ONE call of the kernel's chamfer builder (chamfer() names one face for all edges)
    chamfer4_edges_1 = [part.edges().sort_by_distance(p)[0] for p in [
        (0, 0, -42.25),
    ]]
    chamfer4_side_1 = [part.faces().sort_by_distance(p)[0] for p in [
        (0, 13.5, -42.25),
    ]]
    chamfer4_edges_2 = [part.edges().sort_by_distance(p)[0] for p in [
        (0, 0, 42.25),
    ]]
    chamfer4_side_2 = [part.faces().sort_by_distance(p)[0] for p in [
        (0, 13.5, 42.25),
    ]]
    chamfer4_edges_3 = [part.edges().sort_by_distance(p)[0] for p in [
        (-36.58957331, 0, 21.125),
    ]]
    chamfer4_side_3 = [part.faces().sort_by_distance(p)[0] for p in [
        (-36.58957331, 13.5, 21.125),
    ]]
    chamfer4_edges_4 = [part.edges().sort_by_distance(p)[0] for p in [
        (-36.58957331, 0, -21.125),
    ]]
    chamfer4_side_4 = [part.faces().sort_by_distance(p)[0] for p in [
        (-36.58957331, 13.5, -21.125),
    ]]
    chamfer4_edges_5 = [part.edges().sort_by_distance(p)[0] for p in [
        (36.58957331, 0, -21.125),
    ]]
    chamfer4_side_5 = [part.faces().sort_by_distance(p)[0] for p in [
        (36.58957331, 13.5, -21.125),
    ]]
    chamfer4_edges_6 = [part.edges().sort_by_distance(p)[0] for p in [
        (36.58957331, 0, 21.125),
    ]]
    chamfer4_side_6 = [part.faces().sort_by_distance(p)[0] for p in [
        (36.58957331, 13.5, 21.125),
    ]]
    chamfer4_edges_7 = [part.edges().sort_by_distance(p)[0] for p in [
        (-48.554046939, 0, 0),
    ]]
    chamfer4_side_7 = [part.faces().sort_by_distance(p)[0] for p in [
        (-48.554046939, 13.5, 0),
    ]]
    chamfer4_edges_8 = [part.edges().sort_by_distance(p)[0] for p in [
        (-24.277023469, 0, 42.049038106),
    ]]
    chamfer4_side_8 = [part.faces().sort_by_distance(p)[0] for p in [
        (-24.277023469, 13.5, 42.049038106),
    ]]
    chamfer4_edges_9 = [part.edges().sort_by_distance(p)[0] for p in [
        (24.277023469, 0, 42.049038106),
    ]]
    chamfer4_side_9 = [part.faces().sort_by_distance(p)[0] for p in [
        (24.277023469, 13.5, 42.049038106),
    ]]
    chamfer4_edges_10 = [part.edges().sort_by_distance(p)[0] for p in [
        (48.554046939, 0, 0),
    ]]
    chamfer4_side_10 = [part.faces().sort_by_distance(p)[0] for p in [
        (48.554046939, 13.5, 0),
    ]]
    chamfer4_edges_11 = [part.edges().sort_by_distance(p)[0] for p in [
        (-24.277023469, 0, -42.049038106),
    ]]
    chamfer4_side_11 = [part.faces().sort_by_distance(p)[0] for p in [
        (-24.277023469, 13.5, -42.049038106),
    ]]
    chamfer4_edges_12 = [part.edges().sort_by_distance(p)[0] for p in [
        (24.277023469, 0, -42.049038106),
    ]]
    chamfer4_side_12 = [part.faces().sort_by_distance(p)[0] for p in [
        (24.277023469, 13.5, -42.049038106),
    ]]
    chamfer4 = BRepFilletAPI_MakeChamfer(part.part.solid().wrapped)
    for e in chamfer4_edges_1:
        chamfer4.Add(CHAMFER4_SIZE, CHAMFER4_SIZE2, e.wrapped, chamfer4_side_1[0].wrapped)  # the first distance lies on this face
    for e in chamfer4_edges_2:
        chamfer4.Add(CHAMFER4_SIZE, CHAMFER4_SIZE2, e.wrapped, chamfer4_side_2[0].wrapped)  # the first distance lies on this face
    for e in chamfer4_edges_3:
        chamfer4.Add(CHAMFER4_SIZE, CHAMFER4_SIZE2, e.wrapped, chamfer4_side_3[0].wrapped)  # the first distance lies on this face
    for e in chamfer4_edges_4:
        chamfer4.Add(CHAMFER4_SIZE, CHAMFER4_SIZE2, e.wrapped, chamfer4_side_4[0].wrapped)  # the first distance lies on this face
    for e in chamfer4_edges_5:
        chamfer4.Add(CHAMFER4_SIZE, CHAMFER4_SIZE2, e.wrapped, chamfer4_side_5[0].wrapped)  # the first distance lies on this face
    for e in chamfer4_edges_6:
        chamfer4.Add(CHAMFER4_SIZE, CHAMFER4_SIZE2, e.wrapped, chamfer4_side_6[0].wrapped)  # the first distance lies on this face
    for e in chamfer4_edges_7:
        chamfer4.Add(CHAMFER4_SIZE, CHAMFER4_SIZE2, e.wrapped, chamfer4_side_7[0].wrapped)  # the first distance lies on this face
    for e in chamfer4_edges_8:
        chamfer4.Add(CHAMFER4_SIZE, CHAMFER4_SIZE2, e.wrapped, chamfer4_side_8[0].wrapped)  # the first distance lies on this face
    for e in chamfer4_edges_9:
        chamfer4.Add(CHAMFER4_SIZE, CHAMFER4_SIZE2, e.wrapped, chamfer4_side_9[0].wrapped)  # the first distance lies on this face
    for e in chamfer4_edges_10:
        chamfer4.Add(CHAMFER4_SIZE, CHAMFER4_SIZE2, e.wrapped, chamfer4_side_10[0].wrapped)  # the first distance lies on this face
    for e in chamfer4_edges_11:
        chamfer4.Add(CHAMFER4_SIZE, CHAMFER4_SIZE2, e.wrapped, chamfer4_side_11[0].wrapped)  # the first distance lies on this face
    for e in chamfer4_edges_12:
        chamfer4.Add(CHAMFER4_SIZE, CHAMFER4_SIZE2, e.wrapped, chamfer4_side_12[0].wrapped)  # the first distance lies on this face
    add(Compound.cast(chamfer4.Shape()), mode=Mode.REPLACE)


solid = part.part
